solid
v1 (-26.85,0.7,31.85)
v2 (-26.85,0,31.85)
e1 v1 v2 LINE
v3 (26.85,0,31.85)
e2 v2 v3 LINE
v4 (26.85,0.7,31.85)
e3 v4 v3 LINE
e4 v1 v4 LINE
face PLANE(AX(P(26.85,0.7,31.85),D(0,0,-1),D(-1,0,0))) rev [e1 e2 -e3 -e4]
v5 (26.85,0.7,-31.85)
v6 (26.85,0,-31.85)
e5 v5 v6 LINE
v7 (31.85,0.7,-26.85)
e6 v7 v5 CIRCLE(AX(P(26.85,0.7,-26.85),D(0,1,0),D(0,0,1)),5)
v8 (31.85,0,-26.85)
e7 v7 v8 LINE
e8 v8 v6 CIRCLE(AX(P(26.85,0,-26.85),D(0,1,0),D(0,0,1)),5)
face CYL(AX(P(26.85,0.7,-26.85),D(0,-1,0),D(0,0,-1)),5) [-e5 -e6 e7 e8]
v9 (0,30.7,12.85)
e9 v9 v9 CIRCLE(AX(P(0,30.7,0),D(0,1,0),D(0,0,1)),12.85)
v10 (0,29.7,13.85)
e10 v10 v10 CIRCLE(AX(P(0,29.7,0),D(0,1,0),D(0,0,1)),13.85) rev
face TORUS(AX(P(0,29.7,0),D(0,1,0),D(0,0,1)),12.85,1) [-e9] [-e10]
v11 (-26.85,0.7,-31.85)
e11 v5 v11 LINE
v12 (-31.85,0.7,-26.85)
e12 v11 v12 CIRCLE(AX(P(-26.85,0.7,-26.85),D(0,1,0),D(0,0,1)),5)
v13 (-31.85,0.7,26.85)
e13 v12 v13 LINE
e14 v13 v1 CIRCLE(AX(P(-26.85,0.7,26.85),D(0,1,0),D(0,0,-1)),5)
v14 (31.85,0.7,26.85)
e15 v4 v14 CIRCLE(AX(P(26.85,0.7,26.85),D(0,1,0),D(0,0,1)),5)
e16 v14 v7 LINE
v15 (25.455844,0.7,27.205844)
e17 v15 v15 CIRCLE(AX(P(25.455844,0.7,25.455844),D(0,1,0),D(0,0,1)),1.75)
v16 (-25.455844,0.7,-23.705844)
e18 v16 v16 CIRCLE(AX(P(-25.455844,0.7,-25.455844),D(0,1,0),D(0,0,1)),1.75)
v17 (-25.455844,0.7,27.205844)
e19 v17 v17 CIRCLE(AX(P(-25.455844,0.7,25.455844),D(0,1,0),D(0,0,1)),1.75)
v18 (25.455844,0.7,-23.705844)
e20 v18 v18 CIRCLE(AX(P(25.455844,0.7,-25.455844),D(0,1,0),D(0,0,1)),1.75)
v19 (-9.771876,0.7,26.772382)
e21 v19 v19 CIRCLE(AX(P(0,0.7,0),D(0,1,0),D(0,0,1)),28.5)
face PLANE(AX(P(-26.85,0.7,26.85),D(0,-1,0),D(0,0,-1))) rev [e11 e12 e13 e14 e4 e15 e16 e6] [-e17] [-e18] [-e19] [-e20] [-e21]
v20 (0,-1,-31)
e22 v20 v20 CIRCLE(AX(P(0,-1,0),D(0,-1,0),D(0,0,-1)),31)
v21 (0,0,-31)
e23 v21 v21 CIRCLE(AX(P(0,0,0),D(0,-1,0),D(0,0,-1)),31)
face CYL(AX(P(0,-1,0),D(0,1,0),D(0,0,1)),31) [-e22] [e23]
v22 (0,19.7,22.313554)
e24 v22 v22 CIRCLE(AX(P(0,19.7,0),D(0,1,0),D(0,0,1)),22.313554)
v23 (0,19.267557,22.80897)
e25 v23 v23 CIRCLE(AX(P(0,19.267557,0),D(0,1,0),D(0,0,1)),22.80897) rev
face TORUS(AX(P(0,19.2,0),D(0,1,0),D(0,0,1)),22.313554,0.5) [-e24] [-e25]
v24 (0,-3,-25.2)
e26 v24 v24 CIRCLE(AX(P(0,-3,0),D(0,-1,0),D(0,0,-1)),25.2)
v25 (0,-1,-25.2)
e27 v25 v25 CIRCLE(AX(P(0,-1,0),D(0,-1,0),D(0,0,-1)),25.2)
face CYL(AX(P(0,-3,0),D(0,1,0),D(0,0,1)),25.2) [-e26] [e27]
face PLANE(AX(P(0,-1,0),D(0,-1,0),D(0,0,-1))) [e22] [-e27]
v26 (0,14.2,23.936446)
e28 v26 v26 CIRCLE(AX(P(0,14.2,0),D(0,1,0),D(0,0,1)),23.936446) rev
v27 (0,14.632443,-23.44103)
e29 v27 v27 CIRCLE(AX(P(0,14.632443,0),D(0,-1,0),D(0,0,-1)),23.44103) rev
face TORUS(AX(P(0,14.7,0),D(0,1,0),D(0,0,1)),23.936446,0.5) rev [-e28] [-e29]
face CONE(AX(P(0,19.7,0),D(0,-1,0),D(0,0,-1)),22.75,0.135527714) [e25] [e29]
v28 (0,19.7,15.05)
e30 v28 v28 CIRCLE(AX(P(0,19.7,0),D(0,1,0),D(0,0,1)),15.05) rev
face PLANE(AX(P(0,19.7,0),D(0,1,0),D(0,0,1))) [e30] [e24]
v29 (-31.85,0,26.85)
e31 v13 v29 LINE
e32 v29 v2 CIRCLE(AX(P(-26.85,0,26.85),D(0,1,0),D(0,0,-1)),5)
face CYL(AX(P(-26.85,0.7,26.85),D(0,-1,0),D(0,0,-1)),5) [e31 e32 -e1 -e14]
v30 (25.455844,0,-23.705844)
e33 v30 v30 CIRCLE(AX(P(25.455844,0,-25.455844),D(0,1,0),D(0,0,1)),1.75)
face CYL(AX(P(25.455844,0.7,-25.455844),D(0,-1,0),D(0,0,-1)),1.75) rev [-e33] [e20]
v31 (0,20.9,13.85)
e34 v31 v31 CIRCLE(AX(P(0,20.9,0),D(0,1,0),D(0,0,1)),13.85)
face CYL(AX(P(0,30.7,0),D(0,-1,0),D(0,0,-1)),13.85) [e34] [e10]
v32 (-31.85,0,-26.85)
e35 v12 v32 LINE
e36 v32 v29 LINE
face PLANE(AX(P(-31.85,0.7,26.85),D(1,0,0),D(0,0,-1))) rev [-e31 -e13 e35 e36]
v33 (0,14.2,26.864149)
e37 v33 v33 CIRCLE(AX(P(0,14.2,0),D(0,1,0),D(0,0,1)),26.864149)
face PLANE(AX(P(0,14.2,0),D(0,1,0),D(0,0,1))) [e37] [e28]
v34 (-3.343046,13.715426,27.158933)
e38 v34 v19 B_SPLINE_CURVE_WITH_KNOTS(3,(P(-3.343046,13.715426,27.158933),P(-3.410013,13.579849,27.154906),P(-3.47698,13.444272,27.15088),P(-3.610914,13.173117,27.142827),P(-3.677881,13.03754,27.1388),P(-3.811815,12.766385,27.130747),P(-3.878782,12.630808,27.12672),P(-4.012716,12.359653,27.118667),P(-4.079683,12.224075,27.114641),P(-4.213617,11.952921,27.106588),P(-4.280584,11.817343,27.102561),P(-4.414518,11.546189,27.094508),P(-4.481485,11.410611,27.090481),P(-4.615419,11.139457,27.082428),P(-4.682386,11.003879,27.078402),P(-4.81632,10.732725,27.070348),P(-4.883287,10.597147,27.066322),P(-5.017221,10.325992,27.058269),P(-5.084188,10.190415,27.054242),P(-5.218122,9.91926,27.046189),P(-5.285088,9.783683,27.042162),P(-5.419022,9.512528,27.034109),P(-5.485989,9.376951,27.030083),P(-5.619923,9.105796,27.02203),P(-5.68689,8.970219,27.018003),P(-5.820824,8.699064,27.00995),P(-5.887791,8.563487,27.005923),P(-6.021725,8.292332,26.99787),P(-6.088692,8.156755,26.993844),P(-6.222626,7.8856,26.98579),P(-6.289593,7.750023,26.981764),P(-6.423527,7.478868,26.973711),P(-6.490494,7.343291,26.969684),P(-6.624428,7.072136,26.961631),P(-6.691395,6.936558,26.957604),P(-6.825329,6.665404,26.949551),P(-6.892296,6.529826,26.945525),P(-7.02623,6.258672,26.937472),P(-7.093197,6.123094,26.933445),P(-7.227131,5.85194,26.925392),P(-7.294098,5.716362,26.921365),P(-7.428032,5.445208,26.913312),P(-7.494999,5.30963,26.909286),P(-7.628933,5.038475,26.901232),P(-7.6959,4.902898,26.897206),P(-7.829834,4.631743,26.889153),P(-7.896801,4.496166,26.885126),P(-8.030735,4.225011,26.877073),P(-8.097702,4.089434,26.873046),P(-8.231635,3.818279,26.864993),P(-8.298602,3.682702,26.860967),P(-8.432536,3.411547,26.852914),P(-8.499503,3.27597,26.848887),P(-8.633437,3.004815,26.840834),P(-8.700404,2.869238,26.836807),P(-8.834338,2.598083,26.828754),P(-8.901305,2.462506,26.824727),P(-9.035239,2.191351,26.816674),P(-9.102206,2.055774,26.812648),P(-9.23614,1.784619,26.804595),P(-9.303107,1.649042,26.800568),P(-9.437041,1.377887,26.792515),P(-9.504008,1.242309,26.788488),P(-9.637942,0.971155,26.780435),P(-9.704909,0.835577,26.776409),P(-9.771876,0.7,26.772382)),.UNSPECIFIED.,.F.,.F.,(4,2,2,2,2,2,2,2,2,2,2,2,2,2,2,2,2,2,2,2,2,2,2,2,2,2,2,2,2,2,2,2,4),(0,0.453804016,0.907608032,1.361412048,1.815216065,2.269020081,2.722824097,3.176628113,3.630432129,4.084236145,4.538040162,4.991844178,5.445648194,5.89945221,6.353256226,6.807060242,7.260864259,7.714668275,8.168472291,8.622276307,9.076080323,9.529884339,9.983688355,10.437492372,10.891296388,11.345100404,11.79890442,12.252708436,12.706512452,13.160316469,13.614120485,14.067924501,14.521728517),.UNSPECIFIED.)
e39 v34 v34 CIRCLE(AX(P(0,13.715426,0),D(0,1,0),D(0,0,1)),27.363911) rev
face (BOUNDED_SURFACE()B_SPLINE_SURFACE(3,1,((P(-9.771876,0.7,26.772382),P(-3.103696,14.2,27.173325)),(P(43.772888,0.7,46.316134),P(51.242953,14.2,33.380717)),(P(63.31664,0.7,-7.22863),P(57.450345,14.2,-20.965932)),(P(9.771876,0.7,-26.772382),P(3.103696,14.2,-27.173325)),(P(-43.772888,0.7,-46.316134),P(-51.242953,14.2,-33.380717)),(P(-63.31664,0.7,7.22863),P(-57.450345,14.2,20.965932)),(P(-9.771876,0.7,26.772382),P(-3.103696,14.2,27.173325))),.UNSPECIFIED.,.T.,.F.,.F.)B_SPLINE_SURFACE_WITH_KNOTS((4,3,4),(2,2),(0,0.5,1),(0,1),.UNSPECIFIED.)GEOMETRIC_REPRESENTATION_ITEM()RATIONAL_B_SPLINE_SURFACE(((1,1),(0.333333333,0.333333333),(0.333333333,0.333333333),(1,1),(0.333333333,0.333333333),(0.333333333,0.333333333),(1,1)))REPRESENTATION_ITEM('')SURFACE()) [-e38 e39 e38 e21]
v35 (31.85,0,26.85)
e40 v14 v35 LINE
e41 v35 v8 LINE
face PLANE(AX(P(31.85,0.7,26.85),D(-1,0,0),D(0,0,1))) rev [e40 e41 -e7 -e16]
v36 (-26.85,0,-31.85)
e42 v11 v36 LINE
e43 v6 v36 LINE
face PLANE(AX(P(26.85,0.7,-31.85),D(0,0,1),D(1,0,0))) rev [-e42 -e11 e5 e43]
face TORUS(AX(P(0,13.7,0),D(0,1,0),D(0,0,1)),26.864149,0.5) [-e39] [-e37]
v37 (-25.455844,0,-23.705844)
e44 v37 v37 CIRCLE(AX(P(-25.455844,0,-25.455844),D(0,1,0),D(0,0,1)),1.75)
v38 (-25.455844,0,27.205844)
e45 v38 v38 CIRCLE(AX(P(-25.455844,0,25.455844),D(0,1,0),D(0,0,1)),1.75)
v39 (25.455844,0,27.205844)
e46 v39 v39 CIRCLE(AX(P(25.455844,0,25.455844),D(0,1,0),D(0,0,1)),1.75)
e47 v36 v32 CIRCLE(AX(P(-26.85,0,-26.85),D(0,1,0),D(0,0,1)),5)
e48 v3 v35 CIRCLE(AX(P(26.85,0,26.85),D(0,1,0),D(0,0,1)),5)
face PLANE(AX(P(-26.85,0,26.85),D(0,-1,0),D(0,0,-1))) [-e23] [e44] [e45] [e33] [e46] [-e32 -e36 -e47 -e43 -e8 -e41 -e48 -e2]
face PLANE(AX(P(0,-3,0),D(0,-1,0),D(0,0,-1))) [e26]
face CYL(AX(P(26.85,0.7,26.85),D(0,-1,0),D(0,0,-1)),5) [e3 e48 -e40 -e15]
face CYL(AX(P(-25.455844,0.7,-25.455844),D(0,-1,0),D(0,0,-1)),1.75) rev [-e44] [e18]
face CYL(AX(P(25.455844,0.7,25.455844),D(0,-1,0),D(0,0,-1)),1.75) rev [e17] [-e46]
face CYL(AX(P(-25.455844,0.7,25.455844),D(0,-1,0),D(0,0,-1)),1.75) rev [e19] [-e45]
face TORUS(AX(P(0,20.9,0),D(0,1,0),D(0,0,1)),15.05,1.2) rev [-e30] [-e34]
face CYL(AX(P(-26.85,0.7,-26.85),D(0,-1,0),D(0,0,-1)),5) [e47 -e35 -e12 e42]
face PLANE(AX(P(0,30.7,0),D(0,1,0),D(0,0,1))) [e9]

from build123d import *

# Parameters (mm, degrees)
SKETCH1_R           = 1.75
BOSS_EXTRUDE1_DEPTH = 0.7
SKETCH2_R           = 31
BOSS_EXTRUDE2_DEPTH = 1
SKETCH3_R           = 25.2
BOSS_EXTRUDE3_DEPTH = 2
SKETCH6_R           = 23.5
SKETCH7_R           = 22.75
SKETCH8_R           = 13.85
BOSS_EXTRUDE4_DEPTH = 11
FILLET1_R           = 1
FILLET2_R           = 1.2
FILLET3_R           = 0.5


with BuildPart() as part:
    # Sketch1 → Boss-Extrude1 (new body)
    with BuildSketch(Plane(origin=(0, 0, 0), x_dir=(1, 0, 0), z_dir=(0, 1, 0))):
        with BuildLine():
            Line((26.85, -31.85), (-26.85, -31.85))
            ThreePointArc((-26.85, -31.85), (-30.385533906, -30.385533906), (-31.85, -26.85))
            Line((-31.85, -26.85), (-31.85, 26.85))
            ThreePointArc((-31.85, 26.85), (-30.385533906, 30.385533906), (-26.85, 31.85))
            Line((-26.85, 31.85), (26.85, 31.85))
            ThreePointArc((26.85, 31.85), (30.385533906, 30.385533906), (31.85, 26.85))
            Line((31.85, 26.85), (31.85, -26.85))
            ThreePointArc((31.85, -26.85), (30.385533906, -30.385533906), (26.85, -31.85))
        make_face()
        with Locations(Location((-25.455844123, 25.455844123, 0), (0, 0, 270))):
            Circle(SKETCH1_R, mode=Mode.SUBTRACT)
        with Locations(Location((25.455844123, -25.455844123, 0), (0, 0, 270))):
            Circle(SKETCH1_R, mode=Mode.SUBTRACT)
        with Locations(Location((25.455844123, 25.455844123, 0), (0, 0, 270))):
            Circle(SKETCH1_R, mode=Mode.SUBTRACT)
        with Locations(Location((-25.455844123, -25.455844123, 0), (0, 0, 270))):
            Circle(SKETCH1_R, mode=Mode.SUBTRACT)
    extrude(amount=BOSS_EXTRUDE1_DEPTH)

    # Sketch2 → Boss-Extrude2 (add)
    with BuildSketch(Plane.XZ):
        with Locations(Location((0, 0, 0), (0, 0, 270))):
            Circle(SKETCH2_R)
    extrude(amount=BOSS_EXTRUDE2_DEPTH)

    # Sketch3 → Boss-Extrude3 (add)
    with BuildSketch(Plane.XZ.offset(1)):
        with Locations(Location((0, 0, 0), (0, 0, 270))):
            Circle(SKETCH3_R)
    extrude(amount=BOSS_EXTRUDE3_DEPTH)

    # Loft1: read off the stored shape, not the designer's step
    # Loft1: loft between two sections, ruled curve by curve
    loft1_from = [
        Edge.make_bspline([(-9.771875949, 0.7, 26.772382046), (43.772888144, 0.7, 46.316133945), (63.316640042, 0.7, -7.228630148), (9.771875949, 0.7, -26.772382046), (-43.772888144, 0.7, -46.316133945), (-63.316640042, 0.7, 7.228630148), (-9.771875949, 0.7, 26.772382046)], [0, 0, 0, 0, 0.5, 0.5, 0.5, 1, 1, 1, 1], 3, [1, 0.333333333, 0.333333333, 1, 0.333333333, 0.333333333, 1]),
    ]
    loft1_to = [
        Edge.make_bspline([(-3.103696241, 14.2, 27.173324597), (51.242952952, 14.2, 33.380717079), (57.450345435, 14.2, -20.965932114), (3.103696241, 14.2, -27.173324597), (-51.242952952, 14.2, -33.380717079), (-57.450345435, 14.2, 20.965932114), (-3.103696241, 14.2, 27.173324597)], [0, 0, 0, 0, 0.5, 0.5, 0.5, 1, 1, 1, 1], 3, [1, 0.333333333, 0.333333333, 1, 0.333333333, 0.333333333, 1]),
    ]
    loft1 = Solid(Shell([*[Face.make_surface_from_curves(loft1_from[k], loft1_to[k]) for k in range(1)], Face(Wire(loft1_from)), Face(Wire(loft1_to))]))
    add(loft1)

    # Sketch6 → Loft2 section 0
    with BuildSketch(Plane(origin=(0, 14.2, 0), x_dir=(1, 0, 0), z_dir=(0, 1, 0))):
        Circle(SKETCH6_R)
    # Sketch7 → Loft2 section 1
    with BuildSketch(Plane(origin=(0, 19.7, 0), x_dir=(1, 0, 0), z_dir=(0, 1, 0))):
        Circle(SKETCH7_R)
    loft()

    # Sketch8 → Boss-Extrude4 (add)
    with BuildSketch(Plane(origin=(0, 19.7, 0), x_dir=(1, 0, 0), z_dir=(0, 1, 0))):
        with Locations(Location((0, 0, 0), (0, 0, 270))):
            Circle(SKETCH8_R)
    extrude(amount=BOSS_EXTRUDE4_DEPTH)

    # Fillet1
    fillet1_edges = [part.edges().sort_by_distance(p)[0] for p in [
        (0, 30.7, -13.85),
    ]]
    fillet(fillet1_edges, radius=FILLET1_R)

    # Fillet2
    fillet2_edges = [part.edges().sort_by_distance(p)[0] for p in [
        (0, 19.7, -13.85),
    ]]
    fillet(fillet2_edges, radius=FILLET2_R)

    # Fillet3
    fillet3_edges = [part.edges().sort_by_distance(p)[0] for p in [
        (3.103696241, 14.2, -27.173324597),
        (-22.75, 19.7, 0),
        (-23.5, 14.2, 0),
    ]]
    fillet(fillet3_edges, radius=FILLET3_R)


solid = part.part
